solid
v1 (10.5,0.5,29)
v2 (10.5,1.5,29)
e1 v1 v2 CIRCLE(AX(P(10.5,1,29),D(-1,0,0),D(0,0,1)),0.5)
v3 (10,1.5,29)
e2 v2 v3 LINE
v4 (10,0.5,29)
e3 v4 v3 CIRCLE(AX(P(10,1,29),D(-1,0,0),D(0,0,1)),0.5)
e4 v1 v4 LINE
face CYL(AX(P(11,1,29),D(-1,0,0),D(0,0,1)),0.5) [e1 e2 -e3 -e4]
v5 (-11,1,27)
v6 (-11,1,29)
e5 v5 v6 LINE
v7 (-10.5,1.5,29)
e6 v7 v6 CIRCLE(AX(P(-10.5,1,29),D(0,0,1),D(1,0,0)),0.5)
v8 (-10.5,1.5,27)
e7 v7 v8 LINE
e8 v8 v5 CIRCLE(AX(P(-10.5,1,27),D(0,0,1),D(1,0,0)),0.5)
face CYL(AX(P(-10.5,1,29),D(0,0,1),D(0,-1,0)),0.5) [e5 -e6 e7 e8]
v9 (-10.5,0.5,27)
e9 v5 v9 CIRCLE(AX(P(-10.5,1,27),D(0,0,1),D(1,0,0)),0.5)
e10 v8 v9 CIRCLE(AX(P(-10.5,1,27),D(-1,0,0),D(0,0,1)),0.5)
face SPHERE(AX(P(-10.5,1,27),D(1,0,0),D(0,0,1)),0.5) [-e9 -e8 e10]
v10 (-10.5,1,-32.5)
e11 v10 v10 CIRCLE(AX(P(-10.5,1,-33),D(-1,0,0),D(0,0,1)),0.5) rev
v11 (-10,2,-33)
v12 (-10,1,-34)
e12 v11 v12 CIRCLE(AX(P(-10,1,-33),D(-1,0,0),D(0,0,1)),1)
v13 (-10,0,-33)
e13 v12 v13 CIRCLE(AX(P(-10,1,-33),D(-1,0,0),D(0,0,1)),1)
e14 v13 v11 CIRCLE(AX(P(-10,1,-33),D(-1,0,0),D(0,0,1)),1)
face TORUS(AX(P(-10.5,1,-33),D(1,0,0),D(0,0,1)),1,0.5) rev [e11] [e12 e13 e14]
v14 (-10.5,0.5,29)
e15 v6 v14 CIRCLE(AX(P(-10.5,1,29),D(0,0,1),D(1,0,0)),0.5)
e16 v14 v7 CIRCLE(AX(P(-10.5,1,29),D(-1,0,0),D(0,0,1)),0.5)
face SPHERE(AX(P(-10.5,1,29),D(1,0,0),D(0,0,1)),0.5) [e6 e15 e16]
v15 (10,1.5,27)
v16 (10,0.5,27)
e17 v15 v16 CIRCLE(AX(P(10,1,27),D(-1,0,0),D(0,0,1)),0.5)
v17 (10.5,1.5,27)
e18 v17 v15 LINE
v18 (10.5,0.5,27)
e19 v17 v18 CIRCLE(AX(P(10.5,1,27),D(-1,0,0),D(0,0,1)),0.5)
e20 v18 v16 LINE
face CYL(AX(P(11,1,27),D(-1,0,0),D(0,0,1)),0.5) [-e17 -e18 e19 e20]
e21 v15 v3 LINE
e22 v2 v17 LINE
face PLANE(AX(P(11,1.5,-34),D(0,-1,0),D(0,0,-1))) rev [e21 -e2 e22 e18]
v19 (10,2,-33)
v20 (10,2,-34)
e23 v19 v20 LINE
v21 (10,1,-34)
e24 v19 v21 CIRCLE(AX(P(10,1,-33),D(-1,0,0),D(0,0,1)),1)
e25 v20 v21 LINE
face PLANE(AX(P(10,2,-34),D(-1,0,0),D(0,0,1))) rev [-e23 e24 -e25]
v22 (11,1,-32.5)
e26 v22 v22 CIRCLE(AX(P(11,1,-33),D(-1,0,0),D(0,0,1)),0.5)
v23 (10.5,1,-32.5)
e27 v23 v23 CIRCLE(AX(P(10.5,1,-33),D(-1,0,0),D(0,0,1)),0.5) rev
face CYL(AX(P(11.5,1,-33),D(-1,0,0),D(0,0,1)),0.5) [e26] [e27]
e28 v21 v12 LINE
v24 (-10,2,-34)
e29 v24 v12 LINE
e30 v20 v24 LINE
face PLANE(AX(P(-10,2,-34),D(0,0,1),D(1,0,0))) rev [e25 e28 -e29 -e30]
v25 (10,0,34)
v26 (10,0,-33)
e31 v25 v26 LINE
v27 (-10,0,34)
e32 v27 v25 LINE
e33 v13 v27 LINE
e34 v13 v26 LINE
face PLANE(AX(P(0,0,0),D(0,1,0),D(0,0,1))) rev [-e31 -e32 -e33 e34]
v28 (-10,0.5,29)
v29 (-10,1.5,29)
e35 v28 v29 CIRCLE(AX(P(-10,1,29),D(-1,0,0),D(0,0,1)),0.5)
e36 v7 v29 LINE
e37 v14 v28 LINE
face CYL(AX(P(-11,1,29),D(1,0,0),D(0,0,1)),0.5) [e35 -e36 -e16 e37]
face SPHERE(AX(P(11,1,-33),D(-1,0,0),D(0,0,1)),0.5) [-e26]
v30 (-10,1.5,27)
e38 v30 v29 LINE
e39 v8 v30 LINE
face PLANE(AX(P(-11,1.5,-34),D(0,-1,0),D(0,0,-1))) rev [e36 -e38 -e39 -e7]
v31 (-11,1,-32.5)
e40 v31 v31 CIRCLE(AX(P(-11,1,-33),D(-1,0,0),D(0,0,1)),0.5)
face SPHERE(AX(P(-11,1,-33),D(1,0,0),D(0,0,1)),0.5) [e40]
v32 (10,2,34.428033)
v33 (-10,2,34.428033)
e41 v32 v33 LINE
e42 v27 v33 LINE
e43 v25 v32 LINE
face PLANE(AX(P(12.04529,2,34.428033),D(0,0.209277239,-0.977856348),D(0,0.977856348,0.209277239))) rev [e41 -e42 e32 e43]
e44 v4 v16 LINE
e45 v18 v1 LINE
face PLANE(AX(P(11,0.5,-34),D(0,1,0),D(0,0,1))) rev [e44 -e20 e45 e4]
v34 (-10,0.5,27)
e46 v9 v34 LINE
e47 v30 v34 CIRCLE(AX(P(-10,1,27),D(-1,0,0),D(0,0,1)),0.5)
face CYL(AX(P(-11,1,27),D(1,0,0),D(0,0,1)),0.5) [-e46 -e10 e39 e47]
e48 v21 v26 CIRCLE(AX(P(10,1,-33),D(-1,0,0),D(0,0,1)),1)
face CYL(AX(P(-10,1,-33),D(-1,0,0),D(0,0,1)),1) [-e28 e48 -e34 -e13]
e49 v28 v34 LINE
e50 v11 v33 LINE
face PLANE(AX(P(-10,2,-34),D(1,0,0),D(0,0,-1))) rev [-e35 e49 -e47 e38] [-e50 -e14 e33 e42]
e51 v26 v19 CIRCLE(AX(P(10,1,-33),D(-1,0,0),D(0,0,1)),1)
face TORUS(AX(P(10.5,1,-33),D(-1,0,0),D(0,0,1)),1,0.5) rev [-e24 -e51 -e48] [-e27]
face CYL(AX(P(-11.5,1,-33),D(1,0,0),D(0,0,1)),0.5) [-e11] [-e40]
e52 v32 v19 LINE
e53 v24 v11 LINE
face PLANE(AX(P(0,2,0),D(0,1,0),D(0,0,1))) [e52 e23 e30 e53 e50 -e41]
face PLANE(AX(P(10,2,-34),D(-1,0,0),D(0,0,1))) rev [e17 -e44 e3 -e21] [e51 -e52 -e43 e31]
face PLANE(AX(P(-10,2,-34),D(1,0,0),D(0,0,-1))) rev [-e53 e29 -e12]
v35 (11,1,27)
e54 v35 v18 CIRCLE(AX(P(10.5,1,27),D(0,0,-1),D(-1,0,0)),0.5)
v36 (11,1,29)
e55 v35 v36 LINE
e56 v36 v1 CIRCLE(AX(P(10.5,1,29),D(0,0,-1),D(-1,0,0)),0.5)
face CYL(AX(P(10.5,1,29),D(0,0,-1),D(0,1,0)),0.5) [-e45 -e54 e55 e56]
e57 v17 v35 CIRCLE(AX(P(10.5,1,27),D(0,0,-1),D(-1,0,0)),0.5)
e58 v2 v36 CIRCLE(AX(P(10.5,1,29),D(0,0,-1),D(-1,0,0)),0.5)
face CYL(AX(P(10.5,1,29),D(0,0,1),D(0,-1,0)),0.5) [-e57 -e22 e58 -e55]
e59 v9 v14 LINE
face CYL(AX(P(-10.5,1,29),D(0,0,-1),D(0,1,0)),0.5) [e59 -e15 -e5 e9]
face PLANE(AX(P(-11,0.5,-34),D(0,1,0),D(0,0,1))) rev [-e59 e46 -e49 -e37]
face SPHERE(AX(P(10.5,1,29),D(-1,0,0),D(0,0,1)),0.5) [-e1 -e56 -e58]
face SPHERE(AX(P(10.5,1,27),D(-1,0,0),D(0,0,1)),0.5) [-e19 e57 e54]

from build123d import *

# Parameters (mm, degrees)
SKETCH1_W                       = 20
SKETCH1_H                       = 68
BOSS_EXTRUDE1_DEPTH             = 2
BOSS_EXTRUDE2_START             = 10
SKETCH2_R                       = 0.5
BOSS_EXTRUDE2_DEPTH             = 1.5
FILLET1_R                       = 0.5
FILLET4_R                       = 0.5
FILLET1_OF_MIRROR2_R            = 0.5
FILLET4_OF_MIRROR2_R            = 0.5
FILLET2_R                       = 1
BOSS_EXTRUDE3_REACH             = 37.948
BOSS_EXTRUDE3_DIRECTION_2_REACH = 37.948
BOSS_EXTRUDE4_START             = 10
BOSS_EXTRUDE4_DEPTH             = 1
FILLET3_R                       = 0.5
FILLET3_OF_MIRROR4_R            = 0.5


with BuildPart() as part:
    # Sketch1 → Boss-Extrude1 (new body)
    with BuildSketch(Plane(origin=(0, 0, 0), x_dir=(1, 0, 0), z_dir=(0, 1, 0))):
        Rectangle(SKETCH1_W, SKETCH1_H)
    extrude(amount=BOSS_EXTRUDE1_DEPTH)

    # Sketch2 → Boss-Extrude2 (add)
    with BuildSketch(Plane(origin=(0, 0, 0), x_dir=(0, 0, -1), z_dir=(1, 0, 0)).offset(BOSS_EXTRUDE2_START)):
        with Locations(Location((33, 1, 0), (0, 0, 180))):
            Circle(SKETCH2_R)
    boss_extrude2 = extrude(amount=BOSS_EXTRUDE2_DEPTH)

    # Fillet1
    fillet1_edges = [part.edges().sort_by_distance(p)[0] for p in [
        (11.5, 1, -33.5),
    ]]
    fillet(fillet1_edges, radius=FILLET1_R)

    # Fillet4
    fillet4_edges = [part.edges().sort_by_distance(p)[0] for p in [
        (10, 1, -33.5),
    ]]
    fillet(fillet4_edges, radius=FILLET4_R - 0.0001)  # a hair under: the kernel refuses the full size

    # Mirror2: Boss-Extrude2 across plane
    add(boss_extrude2.mirror(Plane(origin=(0, 0, 0), x_dir=(0, 0, 1), z_dir=(1, 0, 0))))

    # Fillet1 of Mirror2
    fillet1_of_mirror2_edges = [part.edges().sort_by_distance(p)[0] for p in [
        (-11.5, 1, -33.5),
    ]]
    fillet(fillet1_of_mirror2_edges, radius=FILLET1_OF_MIRROR2_R)

    # Fillet4 of Mirror2
    fillet4_of_mirror2_edges = [part.edges().sort_by_distance(p)[0] for p in [
        (-10, 1, -33.5),
    ]]
    fillet(fillet4_of_mirror2_edges, radius=FILLET4_OF_MIRROR2_R - 0.0001)  # a hair under: the kernel refuses the full size

    # Fillet2
    fillet2_edges = [part.edges().sort_by_distance(p)[0] for p in [
        (0, 0, -34),
    ]]
    fillet(fillet2_edges, radius=FILLET2_R)

    # Boss-Extrude3: up to this face of the body (flat: up to its plane)
    boss_extrude3_end = Plane(part.part.faces().sort_by_distance((10, 1.001256492, 0.836072409))[0])
    # Sketch3 → Boss-Extrude3 (add, up to the picked face)
    with BuildSketch(Plane(origin=(0, 0, 0), x_dir=(0, 0, -1), z_dir=(1, 0, 0)), mode=Mode.PRIVATE) as boss_extrude3_sk1:
        Polygon((-34, 2), (-34.428032686, 2), (-34, 0), align=None)
    boss_extrude3_tool1 = split(extrude(boss_extrude3_sk1.sketch, amount=BOSS_EXTRUDE3_REACH, mode=Mode.PRIVATE), bisect_by=boss_extrude3_end, keep=Keep.BOTH, mode=Mode.PRIVATE)
    add(boss_extrude3_tool1.solids().sort_by(Axis((0, 1.333333, 34.142678), (1, 0, 0)))[0])

    # Boss-Extrude3 direction 2: up to this face of the body (flat: up to its plane)
    boss_extrude3_direction_2_end = Plane(part.part.faces().sort_by_distance((-10, 1.001256492, 0.836072409))[0])
    # Sketch3 → Boss-Extrude3 direction 2 (add, up to the picked face)
    with BuildSketch(Plane(origin=(0, 0, 0), x_dir=(0, 0, -1), z_dir=(1, 0, 0)), mode=Mode.PRIVATE) as boss_extrude3_direction_2_sk1:
        Polygon((-34, 2), (-34.428032686, 2), (-34, 0), align=None)
    boss_extrude3_direction_2_tool1 = split(extrude(boss_extrude3_direction_2_sk1.sketch, amount=-BOSS_EXTRUDE3_DIRECTION_2_REACH, mode=Mode.PRIVATE), bisect_by=boss_extrude3_direction_2_end, keep=Keep.BOTH, mode=Mode.PRIVATE)
    add(boss_extrude3_direction_2_tool1.solids().sort_by(Axis((0, 1.333333, 34.142678), (-1, 0, 0)))[0])

    # Sketch4 → Boss-Extrude4 (add)
    with BuildSketch(Plane(origin=(0, 0, 0), x_dir=(0, 0, -1), z_dir=(1, 0, 0)).offset(BOSS_EXTRUDE4_START)):
        with BuildLine():
            Line((-27, 0.5), (-29, 0.5))
            ThreePointArc((-29, 0.5), (-29.5, 1), (-29, 1.5))
            Line((-29, 1.5), (-27, 1.5))
            ThreePointArc((-27, 1.5), (-26.5, 1), (-27, 0.5))
        make_face()
    boss_extrude4 = extrude(amount=BOSS_EXTRUDE4_DEPTH)

    # Fillet3
    fillet3_edges = [part.edges().sort_by_distance(p)[0] for p in [
        (11, 1, 29.5),
        (11, 1, 26.5),
        (11, 0.5, 28),
        (11, 1.5, 28),
    ]]
    fillet(fillet3_edges, radius=FILLET3_R)

    # Mirror4: Boss-Extrude4 across plane
    add(boss_extrude4.mirror(Plane(origin=(0, 0, 0), x_dir=(0, 0, 1), z_dir=(1, 0, 0))))

    # Fillet3 of Mirror4
    fillet3_of_mirror4_edges = [part.edges().sort_by_distance(p)[0] for p in [
        (-11, 1, 29.5),
        (-11, 1, 26.5),
        (-11, 0.5, 28),
        (-11, 1.5, 28),
    ]]
    fillet(fillet3_of_mirror4_edges, radius=FILLET3_OF_MIRROR4_R)


solid = part.part
